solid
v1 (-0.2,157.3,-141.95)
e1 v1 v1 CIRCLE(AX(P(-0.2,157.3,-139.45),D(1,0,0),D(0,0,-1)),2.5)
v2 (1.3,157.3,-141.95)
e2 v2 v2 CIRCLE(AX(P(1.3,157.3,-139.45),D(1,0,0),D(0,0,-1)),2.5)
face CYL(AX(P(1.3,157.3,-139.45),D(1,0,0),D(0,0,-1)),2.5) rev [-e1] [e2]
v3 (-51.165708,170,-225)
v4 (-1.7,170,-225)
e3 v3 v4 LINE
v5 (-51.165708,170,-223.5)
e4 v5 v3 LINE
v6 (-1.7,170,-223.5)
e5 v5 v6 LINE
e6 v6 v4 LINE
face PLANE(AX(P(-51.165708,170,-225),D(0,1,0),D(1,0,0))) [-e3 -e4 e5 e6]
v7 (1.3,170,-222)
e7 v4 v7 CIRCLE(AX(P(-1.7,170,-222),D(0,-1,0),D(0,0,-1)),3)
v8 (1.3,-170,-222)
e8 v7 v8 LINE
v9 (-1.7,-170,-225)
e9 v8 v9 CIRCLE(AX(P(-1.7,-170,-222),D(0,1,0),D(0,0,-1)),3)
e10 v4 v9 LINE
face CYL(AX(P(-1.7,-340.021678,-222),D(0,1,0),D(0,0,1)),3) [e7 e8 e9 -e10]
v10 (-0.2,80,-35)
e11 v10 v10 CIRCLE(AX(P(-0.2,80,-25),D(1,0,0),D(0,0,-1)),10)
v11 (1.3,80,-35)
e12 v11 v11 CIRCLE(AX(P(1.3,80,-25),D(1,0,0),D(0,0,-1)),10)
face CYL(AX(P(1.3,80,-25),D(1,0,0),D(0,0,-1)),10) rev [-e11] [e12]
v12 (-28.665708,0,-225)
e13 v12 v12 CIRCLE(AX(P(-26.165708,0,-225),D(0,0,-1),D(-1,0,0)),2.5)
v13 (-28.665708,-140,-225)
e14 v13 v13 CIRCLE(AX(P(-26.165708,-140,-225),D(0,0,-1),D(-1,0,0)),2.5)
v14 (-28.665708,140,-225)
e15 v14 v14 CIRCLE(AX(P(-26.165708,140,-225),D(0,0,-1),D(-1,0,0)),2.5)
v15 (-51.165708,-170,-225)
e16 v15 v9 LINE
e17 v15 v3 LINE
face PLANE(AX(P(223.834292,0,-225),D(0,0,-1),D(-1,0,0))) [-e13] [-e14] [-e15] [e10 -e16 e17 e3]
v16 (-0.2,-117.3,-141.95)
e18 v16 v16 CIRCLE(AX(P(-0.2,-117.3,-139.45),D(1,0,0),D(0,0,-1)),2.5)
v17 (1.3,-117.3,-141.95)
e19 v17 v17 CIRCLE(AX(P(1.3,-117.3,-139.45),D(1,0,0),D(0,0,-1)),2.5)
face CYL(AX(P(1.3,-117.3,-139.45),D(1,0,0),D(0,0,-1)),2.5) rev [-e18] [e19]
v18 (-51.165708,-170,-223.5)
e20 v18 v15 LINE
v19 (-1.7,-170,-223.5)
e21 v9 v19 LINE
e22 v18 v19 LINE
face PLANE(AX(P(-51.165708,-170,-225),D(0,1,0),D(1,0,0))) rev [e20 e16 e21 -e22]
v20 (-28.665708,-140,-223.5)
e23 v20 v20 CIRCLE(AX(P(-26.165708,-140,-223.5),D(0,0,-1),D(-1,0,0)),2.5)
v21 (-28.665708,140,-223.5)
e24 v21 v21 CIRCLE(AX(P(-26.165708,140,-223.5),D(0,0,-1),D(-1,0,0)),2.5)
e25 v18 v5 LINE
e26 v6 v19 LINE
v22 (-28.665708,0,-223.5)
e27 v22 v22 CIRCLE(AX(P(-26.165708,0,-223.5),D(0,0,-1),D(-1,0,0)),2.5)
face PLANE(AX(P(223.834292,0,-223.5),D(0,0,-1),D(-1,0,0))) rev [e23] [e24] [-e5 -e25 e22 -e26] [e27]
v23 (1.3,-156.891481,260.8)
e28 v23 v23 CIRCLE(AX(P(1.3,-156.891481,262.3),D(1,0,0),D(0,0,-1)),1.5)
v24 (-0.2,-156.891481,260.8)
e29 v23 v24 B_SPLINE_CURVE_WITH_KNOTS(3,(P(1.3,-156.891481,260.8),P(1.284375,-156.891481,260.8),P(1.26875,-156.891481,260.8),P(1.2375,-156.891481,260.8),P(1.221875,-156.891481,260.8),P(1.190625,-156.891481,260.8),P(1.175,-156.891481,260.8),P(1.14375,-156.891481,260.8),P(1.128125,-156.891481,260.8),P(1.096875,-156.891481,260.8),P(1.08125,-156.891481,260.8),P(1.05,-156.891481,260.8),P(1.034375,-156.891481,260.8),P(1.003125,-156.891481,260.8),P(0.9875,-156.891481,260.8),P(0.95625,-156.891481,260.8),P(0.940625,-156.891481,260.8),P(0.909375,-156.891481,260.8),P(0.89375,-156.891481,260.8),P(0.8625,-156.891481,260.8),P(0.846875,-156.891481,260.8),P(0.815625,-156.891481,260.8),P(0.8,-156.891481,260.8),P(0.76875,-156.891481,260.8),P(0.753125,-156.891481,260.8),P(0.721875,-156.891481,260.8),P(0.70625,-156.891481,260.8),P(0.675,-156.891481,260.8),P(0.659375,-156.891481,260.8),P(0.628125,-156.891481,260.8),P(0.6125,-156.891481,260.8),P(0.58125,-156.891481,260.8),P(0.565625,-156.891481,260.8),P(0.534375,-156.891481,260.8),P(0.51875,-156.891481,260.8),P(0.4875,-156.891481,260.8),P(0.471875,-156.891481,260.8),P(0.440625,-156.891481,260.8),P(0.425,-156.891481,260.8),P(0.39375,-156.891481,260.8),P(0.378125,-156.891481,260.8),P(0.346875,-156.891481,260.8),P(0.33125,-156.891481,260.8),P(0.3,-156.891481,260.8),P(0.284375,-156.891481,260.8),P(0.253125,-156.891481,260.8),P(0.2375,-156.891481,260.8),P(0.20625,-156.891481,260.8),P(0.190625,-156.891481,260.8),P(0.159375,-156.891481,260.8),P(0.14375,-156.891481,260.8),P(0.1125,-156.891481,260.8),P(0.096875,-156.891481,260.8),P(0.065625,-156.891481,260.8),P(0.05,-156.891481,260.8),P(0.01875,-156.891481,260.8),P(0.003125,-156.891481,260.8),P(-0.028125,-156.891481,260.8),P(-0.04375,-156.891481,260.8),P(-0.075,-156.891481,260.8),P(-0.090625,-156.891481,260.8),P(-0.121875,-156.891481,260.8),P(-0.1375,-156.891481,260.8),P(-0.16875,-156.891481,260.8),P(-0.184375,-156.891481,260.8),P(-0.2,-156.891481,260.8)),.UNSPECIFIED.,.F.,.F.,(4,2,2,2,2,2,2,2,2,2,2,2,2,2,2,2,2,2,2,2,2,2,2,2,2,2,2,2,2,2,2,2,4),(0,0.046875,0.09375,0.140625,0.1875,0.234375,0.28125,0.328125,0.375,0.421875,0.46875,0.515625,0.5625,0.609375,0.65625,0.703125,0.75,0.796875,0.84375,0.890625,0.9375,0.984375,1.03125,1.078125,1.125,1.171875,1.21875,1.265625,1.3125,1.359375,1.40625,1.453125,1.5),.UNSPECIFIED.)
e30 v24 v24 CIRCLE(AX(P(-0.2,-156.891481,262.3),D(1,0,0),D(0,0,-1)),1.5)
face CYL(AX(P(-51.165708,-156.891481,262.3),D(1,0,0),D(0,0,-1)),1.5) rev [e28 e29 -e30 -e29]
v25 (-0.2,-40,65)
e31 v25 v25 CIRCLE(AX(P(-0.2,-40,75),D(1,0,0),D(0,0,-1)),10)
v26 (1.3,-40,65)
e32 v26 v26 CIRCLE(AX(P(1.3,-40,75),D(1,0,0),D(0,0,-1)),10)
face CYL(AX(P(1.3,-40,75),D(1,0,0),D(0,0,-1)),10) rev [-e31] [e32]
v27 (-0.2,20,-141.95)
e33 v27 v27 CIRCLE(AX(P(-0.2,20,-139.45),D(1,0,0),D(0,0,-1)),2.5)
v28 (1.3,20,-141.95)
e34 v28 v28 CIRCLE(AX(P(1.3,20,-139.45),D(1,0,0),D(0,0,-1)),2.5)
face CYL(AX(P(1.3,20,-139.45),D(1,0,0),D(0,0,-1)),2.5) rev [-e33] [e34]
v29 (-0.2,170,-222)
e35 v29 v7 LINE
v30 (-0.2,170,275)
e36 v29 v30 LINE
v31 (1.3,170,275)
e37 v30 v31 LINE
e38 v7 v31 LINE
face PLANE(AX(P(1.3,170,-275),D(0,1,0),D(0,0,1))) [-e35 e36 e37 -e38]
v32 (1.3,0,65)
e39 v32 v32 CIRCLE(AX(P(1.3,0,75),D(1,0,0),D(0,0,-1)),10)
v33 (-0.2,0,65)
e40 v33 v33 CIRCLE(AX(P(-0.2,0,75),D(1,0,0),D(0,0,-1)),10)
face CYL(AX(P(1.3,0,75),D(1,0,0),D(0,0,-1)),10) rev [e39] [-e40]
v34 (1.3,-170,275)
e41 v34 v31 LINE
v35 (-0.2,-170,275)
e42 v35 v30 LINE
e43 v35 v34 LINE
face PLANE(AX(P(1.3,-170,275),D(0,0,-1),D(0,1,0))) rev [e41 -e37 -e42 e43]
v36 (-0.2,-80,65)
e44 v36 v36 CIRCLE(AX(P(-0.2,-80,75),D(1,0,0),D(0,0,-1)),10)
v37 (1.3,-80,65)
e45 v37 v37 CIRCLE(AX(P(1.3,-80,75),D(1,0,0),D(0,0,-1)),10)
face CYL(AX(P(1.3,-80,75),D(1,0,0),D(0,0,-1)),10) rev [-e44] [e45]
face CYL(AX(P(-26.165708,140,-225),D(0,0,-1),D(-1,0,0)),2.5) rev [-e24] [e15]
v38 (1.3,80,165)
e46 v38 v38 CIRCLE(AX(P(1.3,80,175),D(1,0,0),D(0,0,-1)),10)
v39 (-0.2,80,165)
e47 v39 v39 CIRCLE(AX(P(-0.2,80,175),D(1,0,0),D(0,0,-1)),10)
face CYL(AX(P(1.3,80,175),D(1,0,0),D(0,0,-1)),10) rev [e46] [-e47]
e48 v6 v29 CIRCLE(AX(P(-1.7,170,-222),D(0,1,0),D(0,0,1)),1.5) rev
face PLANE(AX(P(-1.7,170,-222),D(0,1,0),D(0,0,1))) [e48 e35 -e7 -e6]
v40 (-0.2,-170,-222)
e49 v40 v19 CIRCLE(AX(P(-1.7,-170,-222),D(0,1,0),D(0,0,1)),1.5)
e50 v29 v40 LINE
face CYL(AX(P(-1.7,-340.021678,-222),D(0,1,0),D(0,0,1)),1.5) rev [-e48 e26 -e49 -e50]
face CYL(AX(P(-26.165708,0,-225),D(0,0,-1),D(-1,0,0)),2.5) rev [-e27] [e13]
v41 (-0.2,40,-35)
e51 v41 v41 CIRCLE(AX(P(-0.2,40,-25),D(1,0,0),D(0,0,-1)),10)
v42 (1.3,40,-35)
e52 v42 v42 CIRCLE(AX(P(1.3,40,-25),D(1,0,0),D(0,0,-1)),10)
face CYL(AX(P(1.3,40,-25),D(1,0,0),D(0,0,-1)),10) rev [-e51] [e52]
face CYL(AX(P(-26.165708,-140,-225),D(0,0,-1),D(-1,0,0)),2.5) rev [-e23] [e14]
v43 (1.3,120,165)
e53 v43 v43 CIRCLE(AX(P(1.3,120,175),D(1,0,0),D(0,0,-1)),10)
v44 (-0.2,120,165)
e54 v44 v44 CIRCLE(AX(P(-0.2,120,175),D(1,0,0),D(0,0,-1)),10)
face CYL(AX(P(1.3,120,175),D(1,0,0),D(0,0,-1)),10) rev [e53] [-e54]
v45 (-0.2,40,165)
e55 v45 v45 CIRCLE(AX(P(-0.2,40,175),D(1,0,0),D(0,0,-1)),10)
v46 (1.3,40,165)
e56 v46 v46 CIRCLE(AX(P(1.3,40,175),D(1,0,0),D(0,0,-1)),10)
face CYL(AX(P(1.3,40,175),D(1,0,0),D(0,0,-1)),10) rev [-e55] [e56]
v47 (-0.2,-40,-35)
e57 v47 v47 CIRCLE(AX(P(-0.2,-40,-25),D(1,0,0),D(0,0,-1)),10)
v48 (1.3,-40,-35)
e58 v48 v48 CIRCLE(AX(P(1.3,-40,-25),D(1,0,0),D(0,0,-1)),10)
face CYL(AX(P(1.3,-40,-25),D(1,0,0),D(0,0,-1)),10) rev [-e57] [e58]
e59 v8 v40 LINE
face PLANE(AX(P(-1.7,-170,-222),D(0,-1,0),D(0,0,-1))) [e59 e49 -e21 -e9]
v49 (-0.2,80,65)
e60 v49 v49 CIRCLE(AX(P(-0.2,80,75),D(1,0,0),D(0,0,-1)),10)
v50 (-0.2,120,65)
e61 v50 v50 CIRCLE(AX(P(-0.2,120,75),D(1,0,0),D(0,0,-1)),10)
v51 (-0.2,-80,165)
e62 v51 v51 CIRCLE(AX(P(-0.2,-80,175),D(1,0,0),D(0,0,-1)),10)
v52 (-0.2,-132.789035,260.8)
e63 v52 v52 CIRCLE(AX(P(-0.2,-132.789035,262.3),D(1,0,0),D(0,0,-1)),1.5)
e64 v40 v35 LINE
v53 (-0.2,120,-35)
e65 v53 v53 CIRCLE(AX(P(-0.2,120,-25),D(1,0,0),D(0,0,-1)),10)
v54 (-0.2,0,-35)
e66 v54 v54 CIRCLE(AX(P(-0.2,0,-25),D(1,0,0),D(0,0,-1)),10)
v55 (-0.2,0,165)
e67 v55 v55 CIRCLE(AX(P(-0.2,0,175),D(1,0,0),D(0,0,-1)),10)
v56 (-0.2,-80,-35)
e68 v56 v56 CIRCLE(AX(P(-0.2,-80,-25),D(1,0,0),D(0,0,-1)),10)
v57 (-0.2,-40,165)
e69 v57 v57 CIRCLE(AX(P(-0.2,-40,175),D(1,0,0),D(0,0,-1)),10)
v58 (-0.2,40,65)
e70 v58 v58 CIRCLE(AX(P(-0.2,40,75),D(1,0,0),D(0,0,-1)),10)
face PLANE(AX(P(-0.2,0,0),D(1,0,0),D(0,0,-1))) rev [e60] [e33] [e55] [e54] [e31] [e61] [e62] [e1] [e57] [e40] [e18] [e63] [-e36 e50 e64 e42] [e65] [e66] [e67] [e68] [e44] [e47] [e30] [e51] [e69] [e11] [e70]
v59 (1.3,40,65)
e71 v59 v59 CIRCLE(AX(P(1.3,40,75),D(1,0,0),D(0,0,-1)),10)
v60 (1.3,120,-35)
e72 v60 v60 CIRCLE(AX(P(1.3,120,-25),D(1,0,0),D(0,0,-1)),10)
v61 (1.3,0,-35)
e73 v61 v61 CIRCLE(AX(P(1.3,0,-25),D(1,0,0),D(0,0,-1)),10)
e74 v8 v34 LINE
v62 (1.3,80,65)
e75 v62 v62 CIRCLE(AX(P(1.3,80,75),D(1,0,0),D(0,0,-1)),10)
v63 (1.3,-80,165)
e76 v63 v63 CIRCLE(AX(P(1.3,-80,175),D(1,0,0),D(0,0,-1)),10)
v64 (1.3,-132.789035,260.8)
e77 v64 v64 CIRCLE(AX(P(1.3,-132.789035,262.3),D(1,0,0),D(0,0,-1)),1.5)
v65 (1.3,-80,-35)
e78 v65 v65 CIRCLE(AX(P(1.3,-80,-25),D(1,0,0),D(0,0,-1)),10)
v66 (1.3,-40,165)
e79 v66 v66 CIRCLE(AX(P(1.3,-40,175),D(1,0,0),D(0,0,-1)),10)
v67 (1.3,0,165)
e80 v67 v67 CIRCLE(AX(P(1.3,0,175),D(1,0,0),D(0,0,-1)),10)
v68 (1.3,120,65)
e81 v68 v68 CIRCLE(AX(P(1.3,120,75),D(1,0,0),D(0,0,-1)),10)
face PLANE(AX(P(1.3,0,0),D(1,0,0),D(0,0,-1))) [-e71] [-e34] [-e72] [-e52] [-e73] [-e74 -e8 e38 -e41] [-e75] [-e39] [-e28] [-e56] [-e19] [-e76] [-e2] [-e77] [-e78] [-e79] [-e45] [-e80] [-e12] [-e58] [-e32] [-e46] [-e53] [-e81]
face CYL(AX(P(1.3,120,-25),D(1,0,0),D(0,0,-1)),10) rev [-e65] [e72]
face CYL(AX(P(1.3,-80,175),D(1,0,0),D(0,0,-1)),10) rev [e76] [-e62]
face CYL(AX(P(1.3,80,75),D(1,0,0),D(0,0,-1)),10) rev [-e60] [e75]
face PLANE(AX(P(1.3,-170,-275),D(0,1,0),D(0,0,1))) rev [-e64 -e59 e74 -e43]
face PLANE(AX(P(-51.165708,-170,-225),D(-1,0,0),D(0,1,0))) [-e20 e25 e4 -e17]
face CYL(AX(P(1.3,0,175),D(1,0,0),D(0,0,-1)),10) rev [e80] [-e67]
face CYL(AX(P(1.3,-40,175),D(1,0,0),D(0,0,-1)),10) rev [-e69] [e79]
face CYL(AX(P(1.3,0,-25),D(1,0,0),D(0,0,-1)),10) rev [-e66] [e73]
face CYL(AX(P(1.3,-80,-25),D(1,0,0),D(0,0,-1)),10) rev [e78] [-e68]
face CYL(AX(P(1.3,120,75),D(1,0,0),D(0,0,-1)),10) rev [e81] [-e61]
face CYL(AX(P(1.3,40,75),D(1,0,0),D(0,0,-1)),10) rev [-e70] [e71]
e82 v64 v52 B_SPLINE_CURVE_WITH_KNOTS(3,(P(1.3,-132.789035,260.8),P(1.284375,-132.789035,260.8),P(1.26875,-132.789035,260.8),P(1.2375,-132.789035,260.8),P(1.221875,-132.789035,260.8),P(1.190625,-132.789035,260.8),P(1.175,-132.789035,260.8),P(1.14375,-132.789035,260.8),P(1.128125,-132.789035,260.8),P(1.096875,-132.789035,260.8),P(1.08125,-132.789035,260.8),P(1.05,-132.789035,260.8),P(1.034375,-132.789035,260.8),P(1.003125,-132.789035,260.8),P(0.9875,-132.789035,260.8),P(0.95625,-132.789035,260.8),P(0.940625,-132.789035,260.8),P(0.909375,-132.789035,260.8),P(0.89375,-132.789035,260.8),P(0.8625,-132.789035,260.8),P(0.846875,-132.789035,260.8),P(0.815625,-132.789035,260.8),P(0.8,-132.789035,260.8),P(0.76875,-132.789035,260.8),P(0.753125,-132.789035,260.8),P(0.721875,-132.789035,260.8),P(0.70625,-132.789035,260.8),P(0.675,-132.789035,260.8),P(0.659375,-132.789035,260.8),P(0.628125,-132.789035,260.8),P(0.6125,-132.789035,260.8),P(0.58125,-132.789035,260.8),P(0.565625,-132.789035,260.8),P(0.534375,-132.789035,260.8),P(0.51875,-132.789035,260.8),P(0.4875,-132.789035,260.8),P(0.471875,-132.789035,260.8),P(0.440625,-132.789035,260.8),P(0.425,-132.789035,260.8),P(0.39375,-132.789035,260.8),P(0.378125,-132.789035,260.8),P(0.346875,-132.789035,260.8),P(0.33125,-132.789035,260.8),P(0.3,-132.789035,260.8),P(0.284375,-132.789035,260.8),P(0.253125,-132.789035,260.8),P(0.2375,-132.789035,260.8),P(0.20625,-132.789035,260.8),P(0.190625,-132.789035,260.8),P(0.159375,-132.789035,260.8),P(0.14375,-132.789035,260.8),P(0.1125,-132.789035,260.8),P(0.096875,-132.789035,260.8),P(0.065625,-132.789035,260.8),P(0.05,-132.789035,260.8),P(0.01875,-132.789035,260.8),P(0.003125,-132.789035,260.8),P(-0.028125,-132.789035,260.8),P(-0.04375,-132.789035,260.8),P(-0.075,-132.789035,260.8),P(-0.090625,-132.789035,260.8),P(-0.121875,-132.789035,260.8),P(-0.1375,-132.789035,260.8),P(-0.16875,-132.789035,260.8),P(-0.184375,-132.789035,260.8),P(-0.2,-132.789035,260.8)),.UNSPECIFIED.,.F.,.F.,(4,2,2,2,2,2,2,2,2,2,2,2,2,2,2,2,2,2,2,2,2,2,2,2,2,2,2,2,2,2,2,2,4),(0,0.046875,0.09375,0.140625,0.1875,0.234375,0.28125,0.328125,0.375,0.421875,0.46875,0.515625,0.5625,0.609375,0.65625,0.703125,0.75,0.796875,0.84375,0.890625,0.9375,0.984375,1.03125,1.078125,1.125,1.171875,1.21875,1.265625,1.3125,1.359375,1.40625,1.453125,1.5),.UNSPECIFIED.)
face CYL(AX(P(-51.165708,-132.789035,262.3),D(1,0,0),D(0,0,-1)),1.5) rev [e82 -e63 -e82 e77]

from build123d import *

# Parameters (mm, degrees)
SKETCH1_W                  = 340
SKETCH1_H                  = 550
BOSS_EXTRUDE1_DEPTH        = 1.3
F_20_0_20_DIAMETER_HOLE1_D = 20
F_5_0_5_DIAMETER_HOLE1_D   = 5
CONVERT_SOLID1_START       = -0.2
CONVERT_SOLID1_OUTLINE_W   = 340
CONVERT_SOLID1_OUTLINE_H   = 550
CONVERT_SOLID1_OUTLINE_R   = 2.5
CONVERT_SOLID1_OUTLINE_R_2 = 10
CONVERT_SOLID1_DEPTH       = 0.2
SKETCHED_START             = -275
SKETCHED_BEND1_OUTLINE_W   = 1.5
SKETCHED_BEND1_OUTLINE_H   = 340
SKETCHED_BEND1_DEPTH       = 50.30822
SKETCHED_START_2           = -225
SKETCHED_BEND1_2_OUTLINE_W = 50.965708265
SKETCHED_BEND1_2_OUTLINE_H = 340
SKETCHED_BEND1_2_OUTLINE_R = 2.5
SKETCHED_BEND1_2_DEPTH     = 3
SKETCHED_START_3           = -171
SKETCHED_BEND1_3_DEPTH     = 342
CUT_EXTRUDE1_DEPTH         = 328.32694619
CUT_EXTRUDE1_DEPTH_BACK    = 328.32694619
SKETCH1_3_R                = 1.5


with BuildPart() as part:
    # Sketch1 → Boss-Extrude1 (new body)
    with BuildSketch(Plane.YZ):
        Rectangle(SKETCH1_W, SKETCH1_H)
    extrude(amount=BOSS_EXTRUDE1_DEPTH)

    # Ø20.0 (20) Diameter Hole1 (through all)
    with Locations(Plane.YZ.offset(1.3)):
        with Locations((80, -25), (40, -25), (120, -25), (0, -25), (-40, -25), (-80, -25), (120, 75), (80, 75), (40, 75), (0, 75), (-40, 75), (-80, 75), (120, 175), (80, 175), (40, 175), (0, 175), (-40, 175), (-80, 175)):
            Hole(F_20_0_20_DIAMETER_HOLE1_D / 2)

    # Ø5.0 (5) Diameter Hole1 (through all)
    with Locations(Plane.YZ.offset(1.3)):
        with Locations((157.3, -139.45), (20, -139.45), (-117.3, -139.45), (140, -250), (0, -250), (-140, -250)):
            Hole(F_5_0_5_DIAMETER_HOLE1_D / 2)

    # Convert-Solid1: read off the stored shape, not the designer's step
    # Convert-Solid1 outline → Convert-Solid1 (add)
    with BuildSketch(Plane.YZ.offset(CONVERT_SOLID1_START)):
        Rectangle(CONVERT_SOLID1_OUTLINE_W, CONVERT_SOLID1_OUTLINE_H)
        with Locations((-140, -250)):
            Circle(CONVERT_SOLID1_OUTLINE_R, mode=Mode.SUBTRACT)
        with Locations((-117.3, -139.45)):
            Circle(CONVERT_SOLID1_OUTLINE_R, mode=Mode.SUBTRACT)
        with Locations((-80, -25)):
            Circle(CONVERT_SOLID1_OUTLINE_R_2, mode=Mode.SUBTRACT)
        with Locations((-40, -25)):
            Circle(CONVERT_SOLID1_OUTLINE_R_2, mode=Mode.SUBTRACT)
        with Locations((0, -250)):
            Circle(CONVERT_SOLID1_OUTLINE_R, mode=Mode.SUBTRACT)
        with Locations((20, -139.45)):
            Circle(CONVERT_SOLID1_OUTLINE_R, mode=Mode.SUBTRACT)
        with Locations((140, -250)):
            Circle(CONVERT_SOLID1_OUTLINE_R, mode=Mode.SUBTRACT)
        with Locations((157.3, -139.45)):
            Circle(CONVERT_SOLID1_OUTLINE_R, mode=Mode.SUBTRACT)
        with Locations((0, -25)):
            Circle(CONVERT_SOLID1_OUTLINE_R_2, mode=Mode.SUBTRACT)
        with Locations((40, -25)):
            Circle(CONVERT_SOLID1_OUTLINE_R_2, mode=Mode.SUBTRACT)
        with Locations((80, -25)):
            Circle(CONVERT_SOLID1_OUTLINE_R_2, mode=Mode.SUBTRACT)
        with Locations((120, -25)):
            Circle(CONVERT_SOLID1_OUTLINE_R_2, mode=Mode.SUBTRACT)
        with Locations((-80, 75)):
            Circle(CONVERT_SOLID1_OUTLINE_R_2, mode=Mode.SUBTRACT)
        with Locations((-40, 75)):
            Circle(CONVERT_SOLID1_OUTLINE_R_2, mode=Mode.SUBTRACT)
        with Locations((-80, 175)):
            Circle(CONVERT_SOLID1_OUTLINE_R_2, mode=Mode.SUBTRACT)
        with Locations((-40, 175)):
            Circle(CONVERT_SOLID1_OUTLINE_R_2, mode=Mode.SUBTRACT)
        with Locations((0, 75)):
            Circle(CONVERT_SOLID1_OUTLINE_R_2, mode=Mode.SUBTRACT)
        with Locations((40, 75)):
            Circle(CONVERT_SOLID1_OUTLINE_R_2, mode=Mode.SUBTRACT)
        with Locations((80, 75)):
            Circle(CONVERT_SOLID1_OUTLINE_R_2, mode=Mode.SUBTRACT)
        with Locations((120, 75)):
            Circle(CONVERT_SOLID1_OUTLINE_R_2, mode=Mode.SUBTRACT)
        with Locations((0, 175)):
            Circle(CONVERT_SOLID1_OUTLINE_R_2, mode=Mode.SUBTRACT)
        with Locations((40, 175)):
            Circle(CONVERT_SOLID1_OUTLINE_R_2, mode=Mode.SUBTRACT)
        with Locations((80, 175)):
            Circle(CONVERT_SOLID1_OUTLINE_R_2, mode=Mode.SUBTRACT)
        with Locations((120, 175)):
            Circle(CONVERT_SOLID1_OUTLINE_R_2, mode=Mode.SUBTRACT)
    extrude(amount=CONVERT_SOLID1_DEPTH)

    # Sketched Bend1: read off the stored shape, not the designer's step
    # Sketched Bend1 outline → Sketched Bend1 (cut)
    with BuildSketch(Plane.XY.offset(SKETCHED_START)):
        with Locations((0.55, 0)):
            Rectangle(SKETCHED_BEND1_OUTLINE_W, SKETCHED_BEND1_OUTLINE_H)
    extrude(amount=SKETCHED_BEND1_DEPTH, mode=Mode.SUBTRACT)

    # Sketched Bend1 2 outline → Sketched Bend1 2 (add)
    with BuildSketch(Plane.XY.offset(SKETCHED_START_2)):
        with Locations((-25.682854133, 0)):
            Rectangle(SKETCHED_BEND1_2_OUTLINE_W, SKETCHED_BEND1_2_OUTLINE_H)
        with Locations((-26.165708265, -140)):
            Circle(SKETCHED_BEND1_2_OUTLINE_R, mode=Mode.SUBTRACT)
        with Locations((-26.165708265, 0)):
            Circle(SKETCHED_BEND1_2_OUTLINE_R, mode=Mode.SUBTRACT)
        with Locations((-26.165708265, 140)):
            Circle(SKETCHED_BEND1_2_OUTLINE_R, mode=Mode.SUBTRACT)
    extrude(amount=SKETCHED_BEND1_2_DEPTH)

    # Sketched Bend1 3 outline → Sketched Bend1 3 (cut)
    with BuildSketch(Plane(origin=(0, 0, 0), x_dir=(1, 0, 0), z_dir=(0, 1, 0)).offset(SKETCHED_START_3)):
        with BuildLine():
            ThreePointArc((-0.2, 222), (-0.639339828, 223.060660172), (-1.7, 223.5))
            Line((-1.7, 223.5), (-51.165708265, 223.5))
            Line((-51.165708265, 223.5), (-51.165708265, 222))
            Line((-51.165708265, 222), (-0.2, 222))
        make_face()
        with BuildLine():
            Line((-0.2, 225), (-1.7, 225))
            ThreePointArc((-1.7, 225), (0.421320344, 224.121320344), (1.3, 222))
            Line((1.3, 222), (1.3, 224.69178))
            Line((1.3, 224.69178), (-0.2, 224.69178))
            Line((-0.2, 224.69178), (-0.2, 225))
        make_face()
    extrude(amount=SKETCHED_BEND1_3_DEPTH, mode=Mode.SUBTRACT)

    # Sketch1<3> → Cut-Extrude1 (cut, two sides: drawn at the far end of the back side and taken through both)
    with BuildSketch(Plane.YZ.offset(-CUT_EXTRUDE1_DEPTH_BACK)):
        with Locations(Location((-132.789034574, 262.3, 0), (0, 0, 270))):
            Circle(SKETCH1_3_R)
        with Locations(Location((-156.891480577, 262.3, 0), (0, 0, 270))):
            Circle(SKETCH1_3_R)
    extrude(amount=CUT_EXTRUDE1_DEPTH + CUT_EXTRUDE1_DEPTH_BACK, mode=Mode.SUBTRACT)


solid = part.part
